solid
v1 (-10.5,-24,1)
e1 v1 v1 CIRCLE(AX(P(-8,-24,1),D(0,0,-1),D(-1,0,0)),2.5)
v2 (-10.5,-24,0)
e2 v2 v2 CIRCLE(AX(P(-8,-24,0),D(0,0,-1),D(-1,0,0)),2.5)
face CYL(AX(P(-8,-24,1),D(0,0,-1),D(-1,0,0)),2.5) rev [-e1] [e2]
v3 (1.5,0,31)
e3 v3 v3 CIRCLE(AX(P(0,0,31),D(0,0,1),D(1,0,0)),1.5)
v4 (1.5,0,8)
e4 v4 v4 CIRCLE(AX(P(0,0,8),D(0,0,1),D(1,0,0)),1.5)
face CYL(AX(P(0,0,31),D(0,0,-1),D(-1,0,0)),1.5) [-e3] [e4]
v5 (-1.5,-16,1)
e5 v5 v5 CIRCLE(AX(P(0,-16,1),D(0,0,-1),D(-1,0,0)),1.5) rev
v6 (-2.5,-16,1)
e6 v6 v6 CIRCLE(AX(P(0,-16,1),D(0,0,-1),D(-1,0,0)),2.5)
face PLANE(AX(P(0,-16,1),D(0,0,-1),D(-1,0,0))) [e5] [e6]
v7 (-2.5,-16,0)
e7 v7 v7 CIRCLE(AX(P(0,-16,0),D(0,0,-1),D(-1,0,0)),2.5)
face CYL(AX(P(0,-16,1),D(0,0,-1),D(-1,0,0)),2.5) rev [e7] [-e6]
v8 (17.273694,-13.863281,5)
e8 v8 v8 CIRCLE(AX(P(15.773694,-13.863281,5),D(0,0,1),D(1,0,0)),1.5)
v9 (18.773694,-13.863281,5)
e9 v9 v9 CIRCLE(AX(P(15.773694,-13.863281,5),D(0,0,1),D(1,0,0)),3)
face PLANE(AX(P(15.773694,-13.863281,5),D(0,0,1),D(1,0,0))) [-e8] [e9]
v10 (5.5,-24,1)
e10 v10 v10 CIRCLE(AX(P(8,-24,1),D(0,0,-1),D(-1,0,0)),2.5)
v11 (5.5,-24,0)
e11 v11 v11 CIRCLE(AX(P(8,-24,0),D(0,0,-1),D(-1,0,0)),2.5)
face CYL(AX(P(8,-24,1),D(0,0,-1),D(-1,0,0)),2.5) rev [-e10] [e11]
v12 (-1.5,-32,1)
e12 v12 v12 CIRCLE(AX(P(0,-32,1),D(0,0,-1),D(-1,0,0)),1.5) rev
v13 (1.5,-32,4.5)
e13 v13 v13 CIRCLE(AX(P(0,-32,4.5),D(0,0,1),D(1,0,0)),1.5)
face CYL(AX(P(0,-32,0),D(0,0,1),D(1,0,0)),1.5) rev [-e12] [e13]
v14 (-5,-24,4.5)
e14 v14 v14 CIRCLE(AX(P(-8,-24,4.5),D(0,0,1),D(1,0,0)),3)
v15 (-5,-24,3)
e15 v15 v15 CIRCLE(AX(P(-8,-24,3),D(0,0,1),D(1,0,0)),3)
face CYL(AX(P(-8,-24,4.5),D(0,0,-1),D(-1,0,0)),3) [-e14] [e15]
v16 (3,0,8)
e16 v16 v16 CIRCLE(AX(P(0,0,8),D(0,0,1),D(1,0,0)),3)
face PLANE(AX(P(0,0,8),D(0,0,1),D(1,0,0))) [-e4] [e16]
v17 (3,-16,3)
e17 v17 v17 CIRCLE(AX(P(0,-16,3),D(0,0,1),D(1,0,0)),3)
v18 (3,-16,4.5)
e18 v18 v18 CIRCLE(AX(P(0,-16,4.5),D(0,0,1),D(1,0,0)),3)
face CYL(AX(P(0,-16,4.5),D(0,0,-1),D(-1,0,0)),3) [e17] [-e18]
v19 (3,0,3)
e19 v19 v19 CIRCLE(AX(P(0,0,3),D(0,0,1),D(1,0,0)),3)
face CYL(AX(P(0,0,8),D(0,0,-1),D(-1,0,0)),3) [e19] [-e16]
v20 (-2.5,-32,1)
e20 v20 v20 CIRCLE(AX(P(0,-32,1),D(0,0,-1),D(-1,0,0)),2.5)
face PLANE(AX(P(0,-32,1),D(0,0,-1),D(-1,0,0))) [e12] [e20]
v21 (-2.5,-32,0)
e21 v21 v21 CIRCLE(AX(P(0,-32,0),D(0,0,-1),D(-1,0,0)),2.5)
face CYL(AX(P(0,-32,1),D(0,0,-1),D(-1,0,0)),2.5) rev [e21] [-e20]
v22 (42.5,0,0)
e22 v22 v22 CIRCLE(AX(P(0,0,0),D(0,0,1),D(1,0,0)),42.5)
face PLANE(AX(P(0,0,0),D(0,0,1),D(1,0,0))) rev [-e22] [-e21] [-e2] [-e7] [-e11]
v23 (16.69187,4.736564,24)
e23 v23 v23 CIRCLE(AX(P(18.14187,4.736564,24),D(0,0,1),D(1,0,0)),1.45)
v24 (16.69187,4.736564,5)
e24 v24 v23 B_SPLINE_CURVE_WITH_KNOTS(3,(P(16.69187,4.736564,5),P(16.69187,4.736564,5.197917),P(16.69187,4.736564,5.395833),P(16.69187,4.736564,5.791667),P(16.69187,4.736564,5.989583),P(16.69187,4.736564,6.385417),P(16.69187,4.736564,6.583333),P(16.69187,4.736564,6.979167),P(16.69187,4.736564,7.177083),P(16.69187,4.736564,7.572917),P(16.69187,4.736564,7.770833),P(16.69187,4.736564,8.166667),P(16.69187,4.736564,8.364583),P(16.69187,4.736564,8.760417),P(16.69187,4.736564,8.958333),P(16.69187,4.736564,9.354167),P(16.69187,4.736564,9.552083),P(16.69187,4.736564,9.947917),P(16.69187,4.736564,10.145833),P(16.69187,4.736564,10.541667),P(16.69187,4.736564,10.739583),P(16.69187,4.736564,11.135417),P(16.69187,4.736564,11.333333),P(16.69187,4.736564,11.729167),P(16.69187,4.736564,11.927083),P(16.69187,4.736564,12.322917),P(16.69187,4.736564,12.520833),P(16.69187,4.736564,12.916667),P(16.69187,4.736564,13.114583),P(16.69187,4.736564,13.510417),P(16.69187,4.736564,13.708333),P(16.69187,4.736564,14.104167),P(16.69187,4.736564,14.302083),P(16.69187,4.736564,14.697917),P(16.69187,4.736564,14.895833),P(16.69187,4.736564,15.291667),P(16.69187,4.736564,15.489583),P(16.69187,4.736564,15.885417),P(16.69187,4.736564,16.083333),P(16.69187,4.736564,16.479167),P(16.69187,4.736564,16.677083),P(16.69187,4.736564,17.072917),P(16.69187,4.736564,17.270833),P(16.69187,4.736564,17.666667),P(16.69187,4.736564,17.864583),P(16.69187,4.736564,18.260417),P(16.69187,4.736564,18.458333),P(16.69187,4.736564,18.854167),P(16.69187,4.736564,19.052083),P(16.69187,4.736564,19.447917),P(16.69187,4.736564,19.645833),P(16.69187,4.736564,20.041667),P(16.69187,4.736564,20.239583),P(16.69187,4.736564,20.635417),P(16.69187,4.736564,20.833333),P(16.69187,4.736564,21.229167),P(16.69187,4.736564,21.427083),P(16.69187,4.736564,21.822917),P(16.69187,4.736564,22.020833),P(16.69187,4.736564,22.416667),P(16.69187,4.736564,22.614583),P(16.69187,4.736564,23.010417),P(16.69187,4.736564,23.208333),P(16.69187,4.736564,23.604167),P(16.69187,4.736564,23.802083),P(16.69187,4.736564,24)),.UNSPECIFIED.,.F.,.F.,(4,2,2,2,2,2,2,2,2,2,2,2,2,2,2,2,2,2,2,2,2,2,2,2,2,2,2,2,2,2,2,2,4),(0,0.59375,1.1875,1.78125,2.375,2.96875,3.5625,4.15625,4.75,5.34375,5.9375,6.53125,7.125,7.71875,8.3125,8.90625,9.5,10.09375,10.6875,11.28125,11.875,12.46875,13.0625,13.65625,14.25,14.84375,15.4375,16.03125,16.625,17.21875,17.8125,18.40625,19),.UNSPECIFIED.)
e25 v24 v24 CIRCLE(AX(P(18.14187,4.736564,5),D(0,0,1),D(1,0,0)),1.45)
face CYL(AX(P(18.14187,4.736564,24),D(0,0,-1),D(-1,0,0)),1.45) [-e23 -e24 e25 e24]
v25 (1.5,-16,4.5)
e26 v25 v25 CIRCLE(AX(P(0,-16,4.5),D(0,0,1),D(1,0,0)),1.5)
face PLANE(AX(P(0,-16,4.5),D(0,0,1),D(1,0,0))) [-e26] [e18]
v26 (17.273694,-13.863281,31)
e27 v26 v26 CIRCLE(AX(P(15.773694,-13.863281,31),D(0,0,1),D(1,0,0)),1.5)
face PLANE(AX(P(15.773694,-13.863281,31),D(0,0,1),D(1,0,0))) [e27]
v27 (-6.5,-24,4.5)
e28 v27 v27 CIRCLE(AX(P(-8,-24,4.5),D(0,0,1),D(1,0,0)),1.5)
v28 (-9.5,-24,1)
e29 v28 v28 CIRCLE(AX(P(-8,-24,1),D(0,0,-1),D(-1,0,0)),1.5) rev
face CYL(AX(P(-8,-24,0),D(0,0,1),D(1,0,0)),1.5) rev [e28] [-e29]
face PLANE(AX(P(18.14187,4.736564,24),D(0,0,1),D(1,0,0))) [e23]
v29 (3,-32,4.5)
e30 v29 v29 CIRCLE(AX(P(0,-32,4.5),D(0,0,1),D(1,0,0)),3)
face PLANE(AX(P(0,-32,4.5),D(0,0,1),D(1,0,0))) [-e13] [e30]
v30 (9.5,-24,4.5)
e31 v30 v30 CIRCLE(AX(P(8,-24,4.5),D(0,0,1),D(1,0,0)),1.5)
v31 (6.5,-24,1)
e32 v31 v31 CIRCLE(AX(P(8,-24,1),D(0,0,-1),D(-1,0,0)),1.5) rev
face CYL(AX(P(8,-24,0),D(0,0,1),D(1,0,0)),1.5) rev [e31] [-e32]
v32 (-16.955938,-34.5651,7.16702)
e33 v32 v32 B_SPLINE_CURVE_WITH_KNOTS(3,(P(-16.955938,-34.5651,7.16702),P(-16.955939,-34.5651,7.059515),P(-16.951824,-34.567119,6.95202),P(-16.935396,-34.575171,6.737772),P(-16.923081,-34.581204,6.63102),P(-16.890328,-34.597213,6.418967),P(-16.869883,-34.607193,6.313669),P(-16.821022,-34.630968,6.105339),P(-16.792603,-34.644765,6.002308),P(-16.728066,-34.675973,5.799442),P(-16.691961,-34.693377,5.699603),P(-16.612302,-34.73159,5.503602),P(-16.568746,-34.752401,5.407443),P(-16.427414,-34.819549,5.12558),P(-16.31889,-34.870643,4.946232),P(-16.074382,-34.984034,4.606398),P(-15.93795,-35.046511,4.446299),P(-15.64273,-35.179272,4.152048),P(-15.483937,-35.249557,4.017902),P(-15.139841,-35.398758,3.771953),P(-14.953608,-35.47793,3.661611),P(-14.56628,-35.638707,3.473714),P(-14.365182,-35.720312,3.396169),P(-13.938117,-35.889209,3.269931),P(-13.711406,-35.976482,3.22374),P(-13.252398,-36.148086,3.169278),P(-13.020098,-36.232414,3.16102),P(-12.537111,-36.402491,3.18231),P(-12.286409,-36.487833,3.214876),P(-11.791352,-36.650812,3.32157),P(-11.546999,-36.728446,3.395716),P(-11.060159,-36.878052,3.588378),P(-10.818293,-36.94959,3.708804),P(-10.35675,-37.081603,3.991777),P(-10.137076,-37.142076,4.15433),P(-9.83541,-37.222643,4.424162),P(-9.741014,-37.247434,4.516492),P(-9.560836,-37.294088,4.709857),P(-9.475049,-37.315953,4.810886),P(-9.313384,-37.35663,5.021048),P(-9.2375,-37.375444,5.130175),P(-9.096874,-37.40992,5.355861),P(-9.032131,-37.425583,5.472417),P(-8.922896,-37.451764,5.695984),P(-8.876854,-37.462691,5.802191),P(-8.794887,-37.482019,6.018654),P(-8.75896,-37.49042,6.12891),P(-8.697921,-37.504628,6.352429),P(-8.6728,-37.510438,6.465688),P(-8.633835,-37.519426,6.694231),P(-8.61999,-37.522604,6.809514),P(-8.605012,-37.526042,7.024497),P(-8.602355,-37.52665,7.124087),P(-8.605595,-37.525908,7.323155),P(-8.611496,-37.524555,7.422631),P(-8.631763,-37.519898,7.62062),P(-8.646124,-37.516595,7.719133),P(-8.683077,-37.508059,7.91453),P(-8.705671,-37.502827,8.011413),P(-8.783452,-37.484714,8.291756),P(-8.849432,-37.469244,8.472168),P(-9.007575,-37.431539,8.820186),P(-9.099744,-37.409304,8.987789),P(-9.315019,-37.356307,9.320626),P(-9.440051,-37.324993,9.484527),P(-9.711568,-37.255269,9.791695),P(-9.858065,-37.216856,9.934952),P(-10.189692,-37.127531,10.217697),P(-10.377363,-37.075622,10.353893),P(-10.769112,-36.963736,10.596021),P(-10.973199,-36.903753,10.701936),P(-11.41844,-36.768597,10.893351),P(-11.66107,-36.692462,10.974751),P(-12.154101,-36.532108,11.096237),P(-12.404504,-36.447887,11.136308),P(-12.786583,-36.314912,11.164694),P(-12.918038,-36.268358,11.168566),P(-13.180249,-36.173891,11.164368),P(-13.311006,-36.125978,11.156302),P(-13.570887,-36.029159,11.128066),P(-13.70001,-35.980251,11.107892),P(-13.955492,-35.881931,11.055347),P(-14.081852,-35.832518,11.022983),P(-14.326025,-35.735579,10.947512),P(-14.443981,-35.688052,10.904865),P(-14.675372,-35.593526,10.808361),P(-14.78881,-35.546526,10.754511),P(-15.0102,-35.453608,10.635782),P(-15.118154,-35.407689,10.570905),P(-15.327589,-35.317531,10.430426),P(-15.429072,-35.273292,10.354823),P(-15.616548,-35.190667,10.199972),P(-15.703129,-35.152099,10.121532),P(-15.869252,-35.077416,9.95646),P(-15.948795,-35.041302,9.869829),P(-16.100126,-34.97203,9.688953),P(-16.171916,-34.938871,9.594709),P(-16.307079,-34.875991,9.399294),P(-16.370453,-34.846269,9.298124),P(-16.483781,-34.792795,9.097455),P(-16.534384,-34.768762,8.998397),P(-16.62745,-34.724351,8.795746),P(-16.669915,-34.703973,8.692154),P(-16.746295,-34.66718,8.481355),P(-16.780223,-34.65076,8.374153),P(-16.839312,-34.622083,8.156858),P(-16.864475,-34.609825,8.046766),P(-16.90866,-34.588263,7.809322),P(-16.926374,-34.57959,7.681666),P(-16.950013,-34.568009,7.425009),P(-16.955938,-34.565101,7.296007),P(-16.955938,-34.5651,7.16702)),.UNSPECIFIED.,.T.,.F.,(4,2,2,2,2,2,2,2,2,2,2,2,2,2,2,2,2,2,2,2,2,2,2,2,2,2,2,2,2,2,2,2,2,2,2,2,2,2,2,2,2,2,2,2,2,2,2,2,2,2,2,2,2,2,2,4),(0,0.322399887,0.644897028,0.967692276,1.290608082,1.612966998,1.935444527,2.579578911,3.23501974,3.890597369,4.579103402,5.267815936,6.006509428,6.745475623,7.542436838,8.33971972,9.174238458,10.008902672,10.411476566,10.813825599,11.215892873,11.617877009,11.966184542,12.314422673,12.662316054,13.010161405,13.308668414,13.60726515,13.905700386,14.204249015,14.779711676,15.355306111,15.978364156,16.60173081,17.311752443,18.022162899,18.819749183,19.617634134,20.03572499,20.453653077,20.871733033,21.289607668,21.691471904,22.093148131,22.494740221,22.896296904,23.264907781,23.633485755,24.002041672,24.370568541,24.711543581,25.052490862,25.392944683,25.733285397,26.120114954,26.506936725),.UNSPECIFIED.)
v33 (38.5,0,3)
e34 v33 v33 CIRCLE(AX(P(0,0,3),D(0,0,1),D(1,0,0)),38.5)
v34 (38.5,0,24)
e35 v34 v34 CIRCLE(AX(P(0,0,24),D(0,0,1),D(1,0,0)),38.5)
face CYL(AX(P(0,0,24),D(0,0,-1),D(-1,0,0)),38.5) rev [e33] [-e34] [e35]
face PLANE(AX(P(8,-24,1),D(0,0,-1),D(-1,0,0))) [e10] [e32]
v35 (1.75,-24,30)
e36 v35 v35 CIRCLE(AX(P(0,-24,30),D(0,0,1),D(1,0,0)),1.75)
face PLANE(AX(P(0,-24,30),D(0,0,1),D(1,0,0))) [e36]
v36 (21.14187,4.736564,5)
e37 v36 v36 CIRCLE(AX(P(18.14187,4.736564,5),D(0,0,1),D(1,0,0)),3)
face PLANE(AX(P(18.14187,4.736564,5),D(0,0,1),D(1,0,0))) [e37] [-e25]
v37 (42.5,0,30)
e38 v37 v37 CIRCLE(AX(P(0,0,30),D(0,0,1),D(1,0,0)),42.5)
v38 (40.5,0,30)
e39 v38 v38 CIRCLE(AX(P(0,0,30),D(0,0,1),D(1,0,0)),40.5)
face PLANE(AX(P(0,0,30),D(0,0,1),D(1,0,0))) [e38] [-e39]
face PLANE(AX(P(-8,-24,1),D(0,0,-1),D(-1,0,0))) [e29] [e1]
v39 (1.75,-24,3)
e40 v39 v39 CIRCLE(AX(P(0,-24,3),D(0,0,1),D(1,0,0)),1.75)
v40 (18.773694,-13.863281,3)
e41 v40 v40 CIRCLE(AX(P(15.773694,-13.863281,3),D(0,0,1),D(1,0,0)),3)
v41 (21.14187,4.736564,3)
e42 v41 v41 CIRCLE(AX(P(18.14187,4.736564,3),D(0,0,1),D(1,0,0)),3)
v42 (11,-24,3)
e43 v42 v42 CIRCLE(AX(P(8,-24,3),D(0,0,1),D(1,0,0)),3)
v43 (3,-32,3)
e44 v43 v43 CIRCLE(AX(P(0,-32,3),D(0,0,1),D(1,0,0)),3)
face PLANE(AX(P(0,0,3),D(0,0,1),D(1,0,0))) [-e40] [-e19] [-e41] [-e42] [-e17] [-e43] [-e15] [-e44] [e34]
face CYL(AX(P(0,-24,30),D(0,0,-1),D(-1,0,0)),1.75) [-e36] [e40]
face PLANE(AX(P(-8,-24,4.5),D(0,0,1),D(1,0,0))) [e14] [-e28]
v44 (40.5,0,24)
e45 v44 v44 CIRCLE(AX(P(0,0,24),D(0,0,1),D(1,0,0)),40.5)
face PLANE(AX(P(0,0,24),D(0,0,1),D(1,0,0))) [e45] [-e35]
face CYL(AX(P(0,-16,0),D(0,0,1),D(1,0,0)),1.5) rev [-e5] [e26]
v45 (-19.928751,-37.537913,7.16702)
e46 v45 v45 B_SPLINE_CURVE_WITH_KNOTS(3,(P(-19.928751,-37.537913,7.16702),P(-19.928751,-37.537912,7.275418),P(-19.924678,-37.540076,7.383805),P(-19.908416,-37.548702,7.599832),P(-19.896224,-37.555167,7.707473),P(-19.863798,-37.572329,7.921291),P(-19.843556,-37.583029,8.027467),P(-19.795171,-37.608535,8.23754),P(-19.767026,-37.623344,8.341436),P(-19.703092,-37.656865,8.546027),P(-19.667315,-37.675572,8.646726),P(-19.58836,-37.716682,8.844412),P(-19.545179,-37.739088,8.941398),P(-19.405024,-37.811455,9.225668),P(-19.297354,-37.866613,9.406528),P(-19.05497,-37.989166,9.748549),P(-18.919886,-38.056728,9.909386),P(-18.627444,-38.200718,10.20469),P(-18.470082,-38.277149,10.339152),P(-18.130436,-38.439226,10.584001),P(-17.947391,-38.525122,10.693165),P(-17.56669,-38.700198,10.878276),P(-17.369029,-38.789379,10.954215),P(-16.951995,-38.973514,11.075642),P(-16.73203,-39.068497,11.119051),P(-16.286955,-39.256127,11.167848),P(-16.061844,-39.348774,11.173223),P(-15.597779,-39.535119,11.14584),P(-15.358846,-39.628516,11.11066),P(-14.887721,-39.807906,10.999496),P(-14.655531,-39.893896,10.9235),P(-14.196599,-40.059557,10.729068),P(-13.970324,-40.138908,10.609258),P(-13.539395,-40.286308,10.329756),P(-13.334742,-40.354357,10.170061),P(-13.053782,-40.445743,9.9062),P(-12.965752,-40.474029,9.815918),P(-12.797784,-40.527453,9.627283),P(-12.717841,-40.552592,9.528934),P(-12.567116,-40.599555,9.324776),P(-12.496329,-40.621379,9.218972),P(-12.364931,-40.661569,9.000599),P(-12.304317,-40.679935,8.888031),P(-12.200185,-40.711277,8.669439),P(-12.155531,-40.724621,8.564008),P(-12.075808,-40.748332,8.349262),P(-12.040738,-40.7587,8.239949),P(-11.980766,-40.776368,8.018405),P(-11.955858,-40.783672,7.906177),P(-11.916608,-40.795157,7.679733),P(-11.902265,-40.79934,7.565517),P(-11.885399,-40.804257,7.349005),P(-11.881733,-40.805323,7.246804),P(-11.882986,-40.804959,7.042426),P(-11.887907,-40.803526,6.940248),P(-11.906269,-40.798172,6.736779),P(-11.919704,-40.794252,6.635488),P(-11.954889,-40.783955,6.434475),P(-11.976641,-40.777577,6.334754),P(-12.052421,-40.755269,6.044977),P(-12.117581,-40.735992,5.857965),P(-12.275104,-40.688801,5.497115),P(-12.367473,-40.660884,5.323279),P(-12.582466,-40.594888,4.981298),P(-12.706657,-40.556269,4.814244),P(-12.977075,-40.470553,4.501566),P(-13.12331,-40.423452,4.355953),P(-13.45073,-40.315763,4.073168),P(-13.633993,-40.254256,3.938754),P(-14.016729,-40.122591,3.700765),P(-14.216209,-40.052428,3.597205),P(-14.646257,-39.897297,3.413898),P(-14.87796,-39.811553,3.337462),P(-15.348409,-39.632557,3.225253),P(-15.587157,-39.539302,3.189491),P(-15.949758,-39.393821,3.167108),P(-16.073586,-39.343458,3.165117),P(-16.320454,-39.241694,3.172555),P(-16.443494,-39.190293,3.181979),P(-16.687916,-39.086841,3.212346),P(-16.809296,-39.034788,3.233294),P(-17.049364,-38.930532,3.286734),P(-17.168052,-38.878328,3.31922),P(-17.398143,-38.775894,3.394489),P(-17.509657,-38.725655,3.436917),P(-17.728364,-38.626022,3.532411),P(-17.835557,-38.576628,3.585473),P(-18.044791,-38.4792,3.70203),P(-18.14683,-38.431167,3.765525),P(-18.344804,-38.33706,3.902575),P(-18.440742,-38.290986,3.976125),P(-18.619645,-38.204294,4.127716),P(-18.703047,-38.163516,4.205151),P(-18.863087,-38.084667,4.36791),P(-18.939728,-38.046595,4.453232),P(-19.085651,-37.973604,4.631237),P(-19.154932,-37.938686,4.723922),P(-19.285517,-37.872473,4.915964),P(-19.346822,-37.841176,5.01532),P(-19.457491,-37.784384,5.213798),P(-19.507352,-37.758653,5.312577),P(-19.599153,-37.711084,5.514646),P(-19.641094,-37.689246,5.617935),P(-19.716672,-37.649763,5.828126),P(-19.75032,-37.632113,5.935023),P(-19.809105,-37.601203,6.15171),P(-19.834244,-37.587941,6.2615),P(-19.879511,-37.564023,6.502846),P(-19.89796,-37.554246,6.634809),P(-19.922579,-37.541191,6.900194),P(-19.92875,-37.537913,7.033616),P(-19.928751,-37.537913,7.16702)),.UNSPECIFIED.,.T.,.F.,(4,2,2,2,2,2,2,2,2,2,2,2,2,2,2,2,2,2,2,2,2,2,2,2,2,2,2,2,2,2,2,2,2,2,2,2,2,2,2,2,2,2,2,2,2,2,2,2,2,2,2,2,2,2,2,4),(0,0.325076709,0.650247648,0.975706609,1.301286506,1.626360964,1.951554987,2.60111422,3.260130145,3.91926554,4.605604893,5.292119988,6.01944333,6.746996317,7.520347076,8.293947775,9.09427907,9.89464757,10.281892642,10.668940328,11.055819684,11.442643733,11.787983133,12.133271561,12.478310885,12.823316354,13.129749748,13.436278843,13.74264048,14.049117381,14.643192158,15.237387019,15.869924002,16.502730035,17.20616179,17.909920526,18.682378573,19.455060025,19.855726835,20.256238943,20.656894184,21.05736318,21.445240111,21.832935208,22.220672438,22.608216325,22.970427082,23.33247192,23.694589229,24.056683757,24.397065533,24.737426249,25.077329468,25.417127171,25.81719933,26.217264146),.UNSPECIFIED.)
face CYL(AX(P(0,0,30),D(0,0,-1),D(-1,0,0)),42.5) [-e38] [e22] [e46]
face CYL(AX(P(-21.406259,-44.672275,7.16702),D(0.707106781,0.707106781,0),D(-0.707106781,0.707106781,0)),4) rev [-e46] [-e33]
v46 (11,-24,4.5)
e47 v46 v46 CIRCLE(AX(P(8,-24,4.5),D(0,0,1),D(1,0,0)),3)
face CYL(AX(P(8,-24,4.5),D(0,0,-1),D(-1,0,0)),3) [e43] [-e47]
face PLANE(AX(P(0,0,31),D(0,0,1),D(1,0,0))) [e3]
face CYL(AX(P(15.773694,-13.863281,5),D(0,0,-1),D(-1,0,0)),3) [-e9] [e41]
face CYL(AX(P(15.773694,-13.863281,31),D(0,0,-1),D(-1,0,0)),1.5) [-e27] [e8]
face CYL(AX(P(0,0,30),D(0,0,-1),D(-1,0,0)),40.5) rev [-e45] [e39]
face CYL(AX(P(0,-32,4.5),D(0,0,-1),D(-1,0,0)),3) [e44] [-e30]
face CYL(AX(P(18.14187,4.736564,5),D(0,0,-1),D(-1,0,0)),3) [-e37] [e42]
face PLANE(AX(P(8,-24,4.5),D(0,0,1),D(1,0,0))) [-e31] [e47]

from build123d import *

# Parameters (mm, degrees)
SKETCH_1_R              = 42.5
SKETCH_1_R_2            = 40.5
EXTRUDE_1_DEPTH         = 30
SKETCH_2_R              = 40.5
SKETCH_2_R_2            = 38.5
EXTRUDE_2_DEPTH         = 24
EXTRUDE_3_OUTLINE_R     = 38.5
EXTRUDE_3_DEPTH         = 3
SKETCH_5_R              = 1.75
EXTRUDE_4_DEPTH         = 27
SKETCH_10_R             = 3
EXTRUDE_10_DEPTH        = 1.5
SKETCH_21_R             = 1.5
CUT_EXTRUDE_1_DEPTH     = 66.289738857
SKETCH_6_R              = 1.5
EXTRUDE_5_DEPTH         = 28
SKETCH_7_R              = 3
EXTRUDE_6_DEPTH         = 2
SKETCH_8_R              = 1.45
EXTRUDE_7_DEPTH         = 21
SKETCH_9_R              = 3
EXTRUDE_8_DEPTH         = 2
SKETCH_22_R             = 2.5
CUT_EXTRUDE_2_DEPTH     = 1
SKETCH_23_R             = 1.5
EXTRUDE_11_DEPTH        = 28
SKETCH_25_R             = 3
EXTRUDE_12_DEPTH        = 5
CUT_EXTRUDE_START       = -40.635067554
CUT_EXTRUDE_3_OUTLINE_R = 4
CUT_EXTRUDE_3_DEPTH     = 8.016303225


# Read off the part's stored shape, not the designer's step: 凸台-拉伸3, 切除-拉伸3
with BuildPart() as part:
    # 草图1 → 凸台-拉伸1 (new body)
    with BuildSketch(Plane.XY):
        Circle(SKETCH_1_R)
        Circle(SKETCH_1_R_2, mode=Mode.SUBTRACT)
    extrude(amount=EXTRUDE_1_DEPTH)

    # 草图2 → 凸台-拉伸2 (add)
    with BuildSketch(Plane.XY):
        Circle(SKETCH_2_R)
        Circle(SKETCH_2_R_2, mode=Mode.SUBTRACT)
    extrude(amount=EXTRUDE_2_DEPTH)

    # 凸台-拉伸3 outline → 凸台-拉伸3 (add)
    with BuildSketch(Plane.XY):
        Circle(EXTRUDE_3_OUTLINE_R)
    extrude(amount=EXTRUDE_3_DEPTH)

    # 草图5 → 凸台-拉伸4 (add)
    with BuildSketch(Plane.XY.offset(3)):
        with Locations((0, -24)):
            Circle(SKETCH_5_R)
    extrude(amount=EXTRUDE_4_DEPTH)

    # 草图10 → 凸台-拉伸10 (add)
    with BuildSketch(Plane.XY.offset(3)):
        with Locations((8, -24)):
            Circle(SKETCH_10_R)
        with Locations((0, -16)):
            Circle(SKETCH_10_R)
        with Locations((-8, -24)):
            Circle(SKETCH_10_R)
        with Locations((0, -32)):
            Circle(SKETCH_10_R)
    extrude(amount=EXTRUDE_10_DEPTH)

    # 草图21 → 切除-拉伸1 (cut, through all)
    with BuildSketch(Plane.XY.offset(4.5)):
        with Locations((-8, -24)):
            Circle(SKETCH_21_R)
        with Locations((0, -16)):
            Circle(SKETCH_21_R)
        with Locations((8, -24)):
            Circle(SKETCH_21_R)
        with Locations((0, -32)):
            Circle(SKETCH_21_R)
    extrude(amount=-CUT_EXTRUDE_1_DEPTH, mode=Mode.SUBTRACT)

    # 草图6 → 凸台-拉伸5 (add)
    with BuildSketch(Plane.XY.offset(3)):
        with Locations((15.773694335, -13.86328125)):
            Circle(SKETCH_6_R)
    extrude(amount=EXTRUDE_5_DEPTH)

    # 草图7 → 凸台-拉伸6 (add)
    with BuildSketch(Plane.XY.offset(3)):
        with Locations((15.773694335, -13.86328125)):
            Circle(SKETCH_7_R)
    extrude(amount=EXTRUDE_6_DEPTH)

    # 草图8 → 凸台-拉伸7 (add)
    with BuildSketch(Plane.XY.offset(3)):
        with Locations(Location((18.141870405, 4.736563967, 0), (0, 0, 180))):
            Circle(SKETCH_8_R)
    extrude(amount=EXTRUDE_7_DEPTH)

    # 草图9 → 凸台-拉伸8 (add)
    with BuildSketch(Plane.XY.offset(3)):
        with Locations((18.141870405, 4.736563967)):
            Circle(SKETCH_9_R)
    extrude(amount=EXTRUDE_8_DEPTH)

    # 草图22 → 切除-拉伸2 (cut)
    with BuildSketch(Plane(origin=(0, 0, 0), x_dir=(-1, 0, 0), z_dir=(0, 0, -1))):
        with Locations((-8, -24)):
            Circle(SKETCH_22_R)
        with Locations((0, -16)):
            Circle(SKETCH_22_R)
        with Locations((8, -24)):
            Circle(SKETCH_22_R)
        with Locations((0, -32)):
            Circle(SKETCH_22_R)
    extrude(amount=-CUT_EXTRUDE_2_DEPTH, mode=Mode.SUBTRACT)

    # 草图23 → 凸台-拉伸11 (add)
    with BuildSketch(Plane.XY.offset(3)):
        Circle(SKETCH_23_R)
    extrude(amount=EXTRUDE_11_DEPTH)

    # 草图25 → 凸台-拉伸12 (add)
    with BuildSketch(Plane.XY.offset(3)):
        Circle(SKETCH_25_R)
    extrude(amount=EXTRUDE_12_DEPTH)

    # 切除-拉伸3 outline → 切除-拉伸3 (cut)
    with BuildSketch(Plane(origin=(0, 0, 0), x_dir=(0.707106781186546, -0.707106781186549, 0), z_dir=(0.707106781186549, 0.707106781186546, 0)).offset(CUT_EXTRUDE_START)):
        with Locations((16.451557856, -7.167019764)):
            Circle(CUT_EXTRUDE_3_OUTLINE_R)
    extrude(amount=CUT_EXTRUDE_3_DEPTH, mode=Mode.SUBTRACT)


solid = part.part
